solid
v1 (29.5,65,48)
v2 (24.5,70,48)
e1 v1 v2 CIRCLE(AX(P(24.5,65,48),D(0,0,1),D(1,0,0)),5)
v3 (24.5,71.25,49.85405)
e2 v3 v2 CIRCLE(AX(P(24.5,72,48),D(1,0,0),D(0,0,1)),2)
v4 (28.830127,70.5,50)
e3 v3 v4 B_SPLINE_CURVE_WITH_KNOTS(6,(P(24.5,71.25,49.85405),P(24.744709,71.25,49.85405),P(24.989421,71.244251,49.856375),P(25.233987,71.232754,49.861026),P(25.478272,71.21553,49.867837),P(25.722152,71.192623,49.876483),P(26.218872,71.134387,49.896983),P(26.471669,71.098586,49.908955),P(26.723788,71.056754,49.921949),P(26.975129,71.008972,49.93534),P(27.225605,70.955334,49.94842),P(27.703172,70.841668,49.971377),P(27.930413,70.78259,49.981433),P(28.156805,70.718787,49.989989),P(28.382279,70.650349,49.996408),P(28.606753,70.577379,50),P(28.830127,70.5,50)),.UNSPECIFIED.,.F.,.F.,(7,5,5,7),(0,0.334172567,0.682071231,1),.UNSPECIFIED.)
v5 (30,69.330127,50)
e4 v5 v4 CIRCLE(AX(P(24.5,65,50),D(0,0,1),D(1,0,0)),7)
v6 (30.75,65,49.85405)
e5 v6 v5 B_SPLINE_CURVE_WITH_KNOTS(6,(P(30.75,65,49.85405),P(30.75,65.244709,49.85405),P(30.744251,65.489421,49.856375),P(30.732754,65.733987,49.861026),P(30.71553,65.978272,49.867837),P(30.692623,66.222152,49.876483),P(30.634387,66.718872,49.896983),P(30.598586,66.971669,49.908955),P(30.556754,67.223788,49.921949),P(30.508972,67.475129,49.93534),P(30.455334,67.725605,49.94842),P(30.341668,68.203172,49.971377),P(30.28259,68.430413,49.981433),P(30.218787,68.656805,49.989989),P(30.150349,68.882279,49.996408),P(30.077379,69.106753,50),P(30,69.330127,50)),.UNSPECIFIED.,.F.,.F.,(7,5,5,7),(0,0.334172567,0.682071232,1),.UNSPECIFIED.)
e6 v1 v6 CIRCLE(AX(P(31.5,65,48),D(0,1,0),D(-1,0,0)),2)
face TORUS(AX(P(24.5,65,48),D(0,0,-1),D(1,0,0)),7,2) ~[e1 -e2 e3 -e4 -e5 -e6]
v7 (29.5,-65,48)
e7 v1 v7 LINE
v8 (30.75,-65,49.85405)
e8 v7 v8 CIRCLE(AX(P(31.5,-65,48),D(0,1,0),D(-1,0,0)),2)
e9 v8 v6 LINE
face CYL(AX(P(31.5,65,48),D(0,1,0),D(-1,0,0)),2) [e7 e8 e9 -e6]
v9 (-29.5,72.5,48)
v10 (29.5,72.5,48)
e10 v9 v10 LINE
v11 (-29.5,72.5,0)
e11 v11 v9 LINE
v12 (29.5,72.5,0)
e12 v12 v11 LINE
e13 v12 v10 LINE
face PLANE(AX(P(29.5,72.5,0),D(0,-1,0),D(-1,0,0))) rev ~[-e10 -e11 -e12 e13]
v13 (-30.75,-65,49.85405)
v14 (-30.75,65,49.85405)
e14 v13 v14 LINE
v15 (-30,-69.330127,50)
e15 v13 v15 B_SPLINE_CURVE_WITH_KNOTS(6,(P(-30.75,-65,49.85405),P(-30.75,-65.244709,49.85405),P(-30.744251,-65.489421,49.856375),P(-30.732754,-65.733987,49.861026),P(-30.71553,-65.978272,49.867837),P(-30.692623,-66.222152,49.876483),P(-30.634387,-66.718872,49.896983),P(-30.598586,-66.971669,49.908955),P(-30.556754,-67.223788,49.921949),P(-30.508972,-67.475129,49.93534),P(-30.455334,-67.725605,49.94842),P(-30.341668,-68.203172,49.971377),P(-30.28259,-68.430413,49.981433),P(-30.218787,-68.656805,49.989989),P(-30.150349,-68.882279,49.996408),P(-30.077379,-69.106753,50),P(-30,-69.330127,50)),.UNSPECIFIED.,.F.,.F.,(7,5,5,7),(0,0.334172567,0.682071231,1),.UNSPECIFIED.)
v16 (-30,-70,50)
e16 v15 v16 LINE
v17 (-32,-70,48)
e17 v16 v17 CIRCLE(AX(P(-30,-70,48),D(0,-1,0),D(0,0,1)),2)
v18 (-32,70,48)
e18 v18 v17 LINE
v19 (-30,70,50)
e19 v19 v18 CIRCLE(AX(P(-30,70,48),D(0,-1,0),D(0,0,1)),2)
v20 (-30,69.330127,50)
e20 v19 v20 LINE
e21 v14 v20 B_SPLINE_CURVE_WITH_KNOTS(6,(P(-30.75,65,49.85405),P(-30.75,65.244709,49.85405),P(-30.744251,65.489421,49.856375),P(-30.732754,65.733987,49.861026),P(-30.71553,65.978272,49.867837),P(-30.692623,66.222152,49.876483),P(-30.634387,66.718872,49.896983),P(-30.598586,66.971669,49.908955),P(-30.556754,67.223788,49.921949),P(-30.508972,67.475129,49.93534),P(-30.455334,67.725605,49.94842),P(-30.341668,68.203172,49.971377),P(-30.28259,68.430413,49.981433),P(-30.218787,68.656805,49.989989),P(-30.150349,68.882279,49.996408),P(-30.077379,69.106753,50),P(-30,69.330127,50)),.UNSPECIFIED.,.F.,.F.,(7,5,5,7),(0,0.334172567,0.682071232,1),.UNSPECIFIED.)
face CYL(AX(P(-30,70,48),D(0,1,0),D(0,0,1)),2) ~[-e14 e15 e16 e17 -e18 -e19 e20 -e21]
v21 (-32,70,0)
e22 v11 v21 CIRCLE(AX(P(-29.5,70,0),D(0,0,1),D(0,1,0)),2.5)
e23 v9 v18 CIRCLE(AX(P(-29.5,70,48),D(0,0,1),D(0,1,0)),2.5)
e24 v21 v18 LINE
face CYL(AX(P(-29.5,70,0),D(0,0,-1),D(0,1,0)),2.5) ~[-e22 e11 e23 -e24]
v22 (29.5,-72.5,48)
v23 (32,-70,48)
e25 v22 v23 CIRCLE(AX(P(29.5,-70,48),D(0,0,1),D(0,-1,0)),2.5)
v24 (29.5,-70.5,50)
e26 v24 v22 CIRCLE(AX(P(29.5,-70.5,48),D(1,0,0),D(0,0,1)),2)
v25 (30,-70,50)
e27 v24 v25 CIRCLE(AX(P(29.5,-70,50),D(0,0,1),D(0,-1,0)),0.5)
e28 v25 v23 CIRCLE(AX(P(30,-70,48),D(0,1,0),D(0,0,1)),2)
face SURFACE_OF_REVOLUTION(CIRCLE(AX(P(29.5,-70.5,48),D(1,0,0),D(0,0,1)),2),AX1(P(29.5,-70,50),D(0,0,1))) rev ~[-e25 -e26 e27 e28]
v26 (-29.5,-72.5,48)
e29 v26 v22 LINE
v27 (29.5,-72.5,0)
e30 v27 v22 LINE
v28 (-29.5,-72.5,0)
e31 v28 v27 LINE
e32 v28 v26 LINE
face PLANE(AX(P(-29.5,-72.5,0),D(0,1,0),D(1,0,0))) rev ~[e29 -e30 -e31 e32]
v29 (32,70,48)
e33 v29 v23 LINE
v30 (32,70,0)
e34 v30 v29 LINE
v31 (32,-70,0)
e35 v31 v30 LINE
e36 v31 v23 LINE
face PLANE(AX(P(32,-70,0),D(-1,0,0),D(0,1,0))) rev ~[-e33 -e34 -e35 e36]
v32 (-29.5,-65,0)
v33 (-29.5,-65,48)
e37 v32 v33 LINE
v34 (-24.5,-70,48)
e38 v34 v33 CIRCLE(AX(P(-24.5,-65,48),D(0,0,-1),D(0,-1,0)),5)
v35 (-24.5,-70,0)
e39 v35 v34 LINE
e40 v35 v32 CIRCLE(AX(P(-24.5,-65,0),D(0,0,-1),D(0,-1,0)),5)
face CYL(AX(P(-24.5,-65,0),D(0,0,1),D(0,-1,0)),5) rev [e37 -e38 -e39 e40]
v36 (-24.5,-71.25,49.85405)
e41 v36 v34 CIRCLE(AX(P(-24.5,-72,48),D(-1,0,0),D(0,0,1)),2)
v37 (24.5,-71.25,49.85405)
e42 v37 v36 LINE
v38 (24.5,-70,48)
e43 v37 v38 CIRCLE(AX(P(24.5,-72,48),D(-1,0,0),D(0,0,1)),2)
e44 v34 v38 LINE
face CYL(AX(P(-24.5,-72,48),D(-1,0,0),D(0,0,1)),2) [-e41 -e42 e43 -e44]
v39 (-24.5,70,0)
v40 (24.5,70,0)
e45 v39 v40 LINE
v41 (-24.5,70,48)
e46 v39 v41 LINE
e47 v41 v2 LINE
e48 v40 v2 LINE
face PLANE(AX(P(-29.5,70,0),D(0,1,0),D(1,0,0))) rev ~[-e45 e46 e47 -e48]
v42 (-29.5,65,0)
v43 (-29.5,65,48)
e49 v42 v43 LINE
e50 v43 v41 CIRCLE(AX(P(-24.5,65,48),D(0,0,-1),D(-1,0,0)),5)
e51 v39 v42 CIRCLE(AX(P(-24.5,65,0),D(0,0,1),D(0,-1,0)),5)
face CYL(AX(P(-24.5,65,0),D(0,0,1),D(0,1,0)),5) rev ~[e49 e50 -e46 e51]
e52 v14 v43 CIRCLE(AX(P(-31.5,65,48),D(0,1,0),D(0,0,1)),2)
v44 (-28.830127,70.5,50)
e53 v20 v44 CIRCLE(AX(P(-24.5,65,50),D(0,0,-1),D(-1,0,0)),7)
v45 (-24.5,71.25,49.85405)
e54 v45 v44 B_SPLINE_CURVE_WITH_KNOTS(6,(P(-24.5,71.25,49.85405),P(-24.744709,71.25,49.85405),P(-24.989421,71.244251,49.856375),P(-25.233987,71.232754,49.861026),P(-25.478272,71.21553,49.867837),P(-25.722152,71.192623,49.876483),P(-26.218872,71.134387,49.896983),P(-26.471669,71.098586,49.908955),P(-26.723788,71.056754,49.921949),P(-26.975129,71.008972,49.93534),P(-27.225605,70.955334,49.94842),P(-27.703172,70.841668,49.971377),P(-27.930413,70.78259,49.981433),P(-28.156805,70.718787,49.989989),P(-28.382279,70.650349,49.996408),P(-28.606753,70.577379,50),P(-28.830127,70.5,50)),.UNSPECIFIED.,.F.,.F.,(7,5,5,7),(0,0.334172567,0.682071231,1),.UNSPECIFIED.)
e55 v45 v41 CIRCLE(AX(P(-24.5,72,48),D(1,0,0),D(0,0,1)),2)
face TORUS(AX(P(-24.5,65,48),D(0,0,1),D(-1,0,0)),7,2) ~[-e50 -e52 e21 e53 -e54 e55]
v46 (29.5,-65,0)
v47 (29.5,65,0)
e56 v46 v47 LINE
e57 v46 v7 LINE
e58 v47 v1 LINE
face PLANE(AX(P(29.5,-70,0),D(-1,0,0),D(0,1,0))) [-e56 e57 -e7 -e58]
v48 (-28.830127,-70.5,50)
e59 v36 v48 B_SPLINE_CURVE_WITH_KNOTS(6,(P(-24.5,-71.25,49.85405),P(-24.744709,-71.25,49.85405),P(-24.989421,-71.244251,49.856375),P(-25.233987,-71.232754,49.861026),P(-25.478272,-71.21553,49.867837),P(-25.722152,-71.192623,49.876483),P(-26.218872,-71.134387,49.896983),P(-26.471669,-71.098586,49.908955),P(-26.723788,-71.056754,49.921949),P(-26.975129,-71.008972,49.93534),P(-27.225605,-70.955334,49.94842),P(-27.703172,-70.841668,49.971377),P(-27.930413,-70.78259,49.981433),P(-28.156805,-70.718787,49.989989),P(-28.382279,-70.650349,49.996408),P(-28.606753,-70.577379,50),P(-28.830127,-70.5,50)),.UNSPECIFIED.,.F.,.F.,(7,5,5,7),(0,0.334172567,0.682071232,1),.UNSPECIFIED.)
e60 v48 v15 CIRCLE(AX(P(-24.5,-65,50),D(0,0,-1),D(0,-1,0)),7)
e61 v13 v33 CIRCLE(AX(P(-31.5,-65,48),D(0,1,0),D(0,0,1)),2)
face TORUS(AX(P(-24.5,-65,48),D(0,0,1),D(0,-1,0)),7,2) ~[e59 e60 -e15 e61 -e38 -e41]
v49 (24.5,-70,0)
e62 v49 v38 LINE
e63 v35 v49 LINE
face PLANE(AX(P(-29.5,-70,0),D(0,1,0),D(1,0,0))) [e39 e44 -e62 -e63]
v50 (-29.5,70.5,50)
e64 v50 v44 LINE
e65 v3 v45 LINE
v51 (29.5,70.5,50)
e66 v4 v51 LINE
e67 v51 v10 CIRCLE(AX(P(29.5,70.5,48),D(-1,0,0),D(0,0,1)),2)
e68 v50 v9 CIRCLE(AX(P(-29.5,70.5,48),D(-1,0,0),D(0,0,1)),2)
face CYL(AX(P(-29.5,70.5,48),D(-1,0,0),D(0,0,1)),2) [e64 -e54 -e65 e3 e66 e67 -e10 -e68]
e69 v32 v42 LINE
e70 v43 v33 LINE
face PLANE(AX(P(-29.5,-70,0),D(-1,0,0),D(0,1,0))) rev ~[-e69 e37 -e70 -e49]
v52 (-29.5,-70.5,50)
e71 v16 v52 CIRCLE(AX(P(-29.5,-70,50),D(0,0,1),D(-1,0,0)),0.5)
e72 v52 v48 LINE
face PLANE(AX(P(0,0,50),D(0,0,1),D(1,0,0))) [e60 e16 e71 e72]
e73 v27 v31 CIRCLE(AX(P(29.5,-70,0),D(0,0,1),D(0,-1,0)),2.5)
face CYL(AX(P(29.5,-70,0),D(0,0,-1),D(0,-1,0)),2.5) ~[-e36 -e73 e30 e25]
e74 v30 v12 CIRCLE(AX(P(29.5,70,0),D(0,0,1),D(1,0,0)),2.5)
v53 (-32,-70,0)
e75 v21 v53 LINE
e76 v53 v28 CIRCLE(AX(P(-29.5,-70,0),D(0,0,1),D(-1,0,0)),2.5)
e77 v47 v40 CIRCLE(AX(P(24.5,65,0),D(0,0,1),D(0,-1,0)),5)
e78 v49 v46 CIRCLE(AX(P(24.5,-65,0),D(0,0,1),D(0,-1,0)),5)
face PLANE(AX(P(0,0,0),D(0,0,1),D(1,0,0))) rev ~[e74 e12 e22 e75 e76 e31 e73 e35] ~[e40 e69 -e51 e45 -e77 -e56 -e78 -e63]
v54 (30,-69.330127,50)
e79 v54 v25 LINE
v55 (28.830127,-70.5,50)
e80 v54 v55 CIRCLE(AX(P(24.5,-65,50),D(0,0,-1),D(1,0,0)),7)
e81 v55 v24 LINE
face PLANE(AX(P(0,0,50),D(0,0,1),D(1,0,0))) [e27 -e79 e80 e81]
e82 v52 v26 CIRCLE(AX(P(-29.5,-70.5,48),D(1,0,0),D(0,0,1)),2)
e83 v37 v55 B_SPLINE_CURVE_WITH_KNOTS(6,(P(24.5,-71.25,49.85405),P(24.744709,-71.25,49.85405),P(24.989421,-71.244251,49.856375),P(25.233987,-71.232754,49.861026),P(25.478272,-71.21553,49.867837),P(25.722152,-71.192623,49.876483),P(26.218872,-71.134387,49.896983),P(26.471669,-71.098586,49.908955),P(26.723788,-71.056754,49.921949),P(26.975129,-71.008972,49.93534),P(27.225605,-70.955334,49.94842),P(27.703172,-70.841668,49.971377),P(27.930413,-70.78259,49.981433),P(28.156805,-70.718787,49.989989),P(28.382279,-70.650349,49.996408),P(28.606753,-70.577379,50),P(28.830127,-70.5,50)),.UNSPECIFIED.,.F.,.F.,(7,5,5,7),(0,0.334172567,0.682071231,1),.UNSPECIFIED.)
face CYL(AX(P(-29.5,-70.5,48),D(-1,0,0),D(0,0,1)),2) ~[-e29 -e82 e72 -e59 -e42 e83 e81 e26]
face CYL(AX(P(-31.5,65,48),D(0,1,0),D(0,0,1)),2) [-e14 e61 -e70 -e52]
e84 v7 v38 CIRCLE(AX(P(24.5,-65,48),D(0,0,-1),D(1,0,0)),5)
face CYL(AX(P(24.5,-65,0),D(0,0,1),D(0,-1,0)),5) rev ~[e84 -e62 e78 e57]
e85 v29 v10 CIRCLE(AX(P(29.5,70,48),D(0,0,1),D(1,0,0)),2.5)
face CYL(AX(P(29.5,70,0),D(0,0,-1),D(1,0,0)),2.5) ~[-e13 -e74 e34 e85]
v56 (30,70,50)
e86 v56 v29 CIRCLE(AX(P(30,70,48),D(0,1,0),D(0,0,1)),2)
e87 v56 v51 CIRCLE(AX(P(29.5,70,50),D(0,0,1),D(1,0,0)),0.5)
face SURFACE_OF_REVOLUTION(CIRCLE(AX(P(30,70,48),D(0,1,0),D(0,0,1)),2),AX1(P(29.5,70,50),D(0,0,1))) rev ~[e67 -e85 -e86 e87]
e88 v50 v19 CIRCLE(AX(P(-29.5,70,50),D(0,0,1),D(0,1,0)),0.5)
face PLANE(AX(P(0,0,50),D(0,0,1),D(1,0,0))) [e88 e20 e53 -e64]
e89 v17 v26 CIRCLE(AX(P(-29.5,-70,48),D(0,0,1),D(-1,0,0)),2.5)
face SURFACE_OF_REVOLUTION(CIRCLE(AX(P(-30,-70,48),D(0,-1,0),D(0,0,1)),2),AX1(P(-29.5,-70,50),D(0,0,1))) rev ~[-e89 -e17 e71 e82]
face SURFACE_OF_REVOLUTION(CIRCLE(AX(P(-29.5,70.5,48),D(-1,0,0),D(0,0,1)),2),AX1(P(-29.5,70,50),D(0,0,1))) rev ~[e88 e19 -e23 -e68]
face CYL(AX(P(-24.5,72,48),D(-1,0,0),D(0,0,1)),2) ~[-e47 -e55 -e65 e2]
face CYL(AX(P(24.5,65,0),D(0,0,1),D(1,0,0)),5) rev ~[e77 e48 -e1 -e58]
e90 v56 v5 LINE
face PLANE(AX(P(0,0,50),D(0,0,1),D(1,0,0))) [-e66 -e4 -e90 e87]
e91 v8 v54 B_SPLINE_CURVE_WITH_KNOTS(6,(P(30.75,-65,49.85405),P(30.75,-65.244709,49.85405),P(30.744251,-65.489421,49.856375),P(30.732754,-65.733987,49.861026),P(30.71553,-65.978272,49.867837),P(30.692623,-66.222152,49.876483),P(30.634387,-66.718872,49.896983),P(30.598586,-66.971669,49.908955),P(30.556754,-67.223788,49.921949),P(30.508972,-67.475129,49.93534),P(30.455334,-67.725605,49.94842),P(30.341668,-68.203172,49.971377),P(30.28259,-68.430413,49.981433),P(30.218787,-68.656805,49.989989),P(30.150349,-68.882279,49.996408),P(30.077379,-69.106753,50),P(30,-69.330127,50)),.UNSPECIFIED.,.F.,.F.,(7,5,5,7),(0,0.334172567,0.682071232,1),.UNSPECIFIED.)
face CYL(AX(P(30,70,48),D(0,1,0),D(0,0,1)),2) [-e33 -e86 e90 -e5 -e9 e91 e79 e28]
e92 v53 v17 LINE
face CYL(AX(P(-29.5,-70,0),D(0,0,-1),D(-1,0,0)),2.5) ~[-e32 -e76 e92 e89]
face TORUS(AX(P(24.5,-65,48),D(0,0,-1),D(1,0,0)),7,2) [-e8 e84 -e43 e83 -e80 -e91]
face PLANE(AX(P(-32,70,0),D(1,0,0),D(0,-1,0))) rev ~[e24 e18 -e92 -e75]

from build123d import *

# Parameters (mm, degrees)
F0_W         = 59
F0_H         = 140
F1_DEPTH     = 50
F2_R         = 5
F3_T1_DEPTH  = 130
F3_T3_DEPTH  = 49
F3_T5_DEPTH  = 59
F3_T7_DEPTH  = 140
F3_T10_ANGLE = 90
F3_T12_ANGLE = 90
F3_T14_ANGLE = 90
F3_T16_ANGLE = 90
F3_T18_ANGLE = 90
F3_T20_ANGLE = 90
F3_T22_ANGLE = 90
F3_T24_ANGLE = 90


# Not quite as in the source:
# - a fillet or chamfer that OpenCascade refuses, or shapes differently, is made with other operations: its cross-section is extruded or revolved along the edge and cut away or added


with BuildPart() as f1:
    # F0 (on Top) → F1 (new body)
    with BuildSketch(Plane.XY):
        with BuildLine():
            Line((-29.5, -72.5), (29.5, -72.5))
            ThreePointArc((29.5, -72.5), (31.267766953, -71.767766953), (32, -70))
            Line((32, -70), (32, 70))
            ThreePointArc((32, 70), (31.267766953, 71.767766953), (29.5, 72.5))
            Line((29.5, 72.5), (-29.5, 72.5))
            ThreePointArc((-29.5, 72.5), (-31.267766953, 71.767766953), (-32, 70))
            Line((-32, 70), (-32, -70))
            ThreePointArc((-32, -70), (-31.267766953, -71.767766953), (-29.5, -72.5))
        make_face()
        Rectangle(F0_W, F0_H, mode=Mode.SUBTRACT)
    extrude(amount=F1_DEPTH)

    # F2
    f2_edges = [f1.edges().sort_by_distance(p)[0] for p in [
        (-29.5, 70, 25),
        (29.5, 70, 25),
        (-29.5, -70, 25),
        (29.5, -70, 25),
    ]]
    fillet(f2_edges, radius=F2_R)

    # F3: fillet of radius 2 on 16 edges, made by hand

    # F3_s2 → F3_t1 (cut)
    with BuildSketch(Plane.XZ.offset(-65)):
        with BuildLine():
            ThreePointArc((29.5, 48), (30.0857864376, 49.4142135624), (31.5, 50))
            Line((31.5, 50), (29.5, 50))
            Line((29.5, 50), (29.5, 48))
        make_face()
        with BuildLine():
            ThreePointArc((-31.5, 50), (-30.0857864376, 49.4142135624), (-29.5, 48))
            Line((-29.5, 48), (-29.5, 50))
            Line((-29.5, 50), (-31.5, 50))
        make_face()
    extrude(amount=F3_T1_DEPTH, mode=Mode.SUBTRACT)

    # F3_s4 → F3_t3 (cut)
    with BuildSketch(Plane.YZ.offset(-24.5)):
        with BuildLine():
            ThreePointArc((72, 50), (70.5857864376, 49.4142135624), (70, 48))
            Line((70, 48), (70, 50))
            Line((70, 50), (72, 50))
        make_face()
        with BuildLine():
            ThreePointArc((-72, 50), (-70.5857864376, 49.4142135624), (-70, 48))
            Line((-70, 48), (-70, 50))
            Line((-70, 50), (-72, 50))
        make_face()
    extrude(amount=F3_T3_DEPTH, mode=Mode.SUBTRACT)

    # F3_s6 → F3_t5 (cut)
    with BuildSketch(Plane.YZ.offset(-29.5)):
        with BuildLine():
            ThreePointArc((-70.5, 50), (-71.9142135624, 49.4142135624), (-72.5, 48))
            Line((-72.5, 48), (-72.5, 50))
            Line((-72.5, 50), (-70.5, 50))
        make_face()
        with BuildLine():
            ThreePointArc((70.5, 50), (71.9142135624, 49.4142135624), (72.5, 48))
            Line((72.5, 48), (72.5, 50))
            Line((72.5, 50), (70.5, 50))
        make_face()
    extrude(amount=F3_T5_DEPTH, mode=Mode.SUBTRACT)

    # F3_s8 → F3_t7 (cut)
    with BuildSketch(Plane.XZ.offset(-70)):
        with BuildLine():
            ThreePointArc((30, 50), (31.4142135624, 49.4142135624), (32, 48))
            Line((32, 48), (32, 50))
            Line((32, 50), (30, 50))
        make_face()
        with BuildLine():
            ThreePointArc((-30, 50), (-31.4142135624, 49.4142135624), (-32, 48))
            Line((-32, 48), (-32, 50))
            Line((-32, 50), (-30, 50))
        make_face()
    extrude(amount=F3_T7_DEPTH, mode=Mode.SUBTRACT)

    # F3_s9 → F3_t10 (revolve, cut)
    with BuildSketch(Plane.XZ.offset(-65)):
        with BuildLine():
            ThreePointArc((29.5, 48), (30.0857864376, 49.4142135624), (31.5, 50))
            Line((31.5, 50), (29.5, 50))
            Line((29.5, 50), (29.5, 48))
        make_face()
    revolve(axis=Axis((24.5, 65, 50), (0, 0, 1)), revolution_arc=F3_T10_ANGLE, mode=Mode.SUBTRACT)

    # F3_s11 → F3_t12 (revolve, cut)
    with BuildSketch(Plane.XZ.offset(65)):
        with BuildLine():
            ThreePointArc((29.5, 48), (30.0857864376, 49.4142135624), (31.5, 50))
            Line((31.5, 50), (29.5, 50))
            Line((29.5, 50), (29.5, 48))
        make_face()
    revolve(axis=Axis((24.5, -65, 50), (0, 0, -1)), revolution_arc=F3_T12_ANGLE, mode=Mode.SUBTRACT)

    # F3_s13 → F3_t14 (revolve, cut)
    with BuildSketch(Plane.XZ.offset(-65)):
        with BuildLine():
            ThreePointArc((-31.5, 50), (-30.0857864376, 49.4142135624), (-29.5, 48))
            Line((-29.5, 48), (-29.5, 50))
            Line((-29.5, 50), (-31.5, 50))
        make_face()
    revolve(axis=Axis((-24.5, 65, 50), (0, 0, -1)), revolution_arc=F3_T14_ANGLE, mode=Mode.SUBTRACT)

    # F3_s15 → F3_t16 (revolve, cut)
    with BuildSketch(Plane.YZ.offset(-24.5)):
        with BuildLine():
            ThreePointArc((-72, 50), (-70.5857864376, 49.4142135624), (-70, 48))
            Line((-70, 48), (-70, 50))
            Line((-70, 50), (-72, 50))
        make_face()
    revolve(axis=Axis((-24.5, -65, 50), (0, 0, -1)), revolution_arc=F3_T16_ANGLE, mode=Mode.SUBTRACT)

    # F3_s17 → F3_t18 (revolve, cut)
    with BuildSketch(Plane.XZ.offset(70)):
        with BuildLine():
            ThreePointArc((-30, 50), (-31.4142135624, 49.4142135624), (-32, 48))
            Line((-32, 48), (-32, 50))
            Line((-32, 50), (-30, 50))
        make_face()
    revolve(axis=Axis((-29.5, -70, 50), (0, 0, 1)), revolution_arc=F3_T18_ANGLE, mode=Mode.SUBTRACT)

    # F3_s19 → F3_t20 (revolve, cut)
    with BuildSketch(Plane.YZ.offset(29.5)):
        with BuildLine():
            ThreePointArc((-70.5, 50), (-71.9142135624, 49.4142135624), (-72.5, 48))
            Line((-72.5, 48), (-72.5, 50))
            Line((-72.5, 50), (-70.5, 50))
        make_face()
    revolve(axis=Axis((29.5, -70, 50), (0, 0, 1)), revolution_arc=F3_T20_ANGLE, mode=Mode.SUBTRACT)

    # F3_s21 → F3_t22 (revolve, cut)
    with BuildSketch(Plane.XZ.offset(-70)):
        with BuildLine():
            ThreePointArc((30, 50), (31.4142135624, 49.4142135624), (32, 48))
            Line((32, 48), (32, 50))
            Line((32, 50), (30, 50))
        make_face()
    revolve(axis=Axis((29.5, 70, 50), (0, 0, 1)), revolution_arc=F3_T22_ANGLE, mode=Mode.SUBTRACT)

    # F3_s23 → F3_t24 (revolve, cut)
    with BuildSketch(Plane.YZ.offset(-29.5)):
        with BuildLine():
            ThreePointArc((70.5, 50), (71.9142135624, 49.4142135624), (72.5, 48))
            Line((72.5, 48), (72.5, 50))
            Line((72.5, 50), (70.5, 50))
        make_face()
    revolve(axis=Axis((-29.5, 70, 50), (0, 0, 1)), revolution_arc=F3_T24_ANGLE, mode=Mode.SUBTRACT)


solid = f1.part
